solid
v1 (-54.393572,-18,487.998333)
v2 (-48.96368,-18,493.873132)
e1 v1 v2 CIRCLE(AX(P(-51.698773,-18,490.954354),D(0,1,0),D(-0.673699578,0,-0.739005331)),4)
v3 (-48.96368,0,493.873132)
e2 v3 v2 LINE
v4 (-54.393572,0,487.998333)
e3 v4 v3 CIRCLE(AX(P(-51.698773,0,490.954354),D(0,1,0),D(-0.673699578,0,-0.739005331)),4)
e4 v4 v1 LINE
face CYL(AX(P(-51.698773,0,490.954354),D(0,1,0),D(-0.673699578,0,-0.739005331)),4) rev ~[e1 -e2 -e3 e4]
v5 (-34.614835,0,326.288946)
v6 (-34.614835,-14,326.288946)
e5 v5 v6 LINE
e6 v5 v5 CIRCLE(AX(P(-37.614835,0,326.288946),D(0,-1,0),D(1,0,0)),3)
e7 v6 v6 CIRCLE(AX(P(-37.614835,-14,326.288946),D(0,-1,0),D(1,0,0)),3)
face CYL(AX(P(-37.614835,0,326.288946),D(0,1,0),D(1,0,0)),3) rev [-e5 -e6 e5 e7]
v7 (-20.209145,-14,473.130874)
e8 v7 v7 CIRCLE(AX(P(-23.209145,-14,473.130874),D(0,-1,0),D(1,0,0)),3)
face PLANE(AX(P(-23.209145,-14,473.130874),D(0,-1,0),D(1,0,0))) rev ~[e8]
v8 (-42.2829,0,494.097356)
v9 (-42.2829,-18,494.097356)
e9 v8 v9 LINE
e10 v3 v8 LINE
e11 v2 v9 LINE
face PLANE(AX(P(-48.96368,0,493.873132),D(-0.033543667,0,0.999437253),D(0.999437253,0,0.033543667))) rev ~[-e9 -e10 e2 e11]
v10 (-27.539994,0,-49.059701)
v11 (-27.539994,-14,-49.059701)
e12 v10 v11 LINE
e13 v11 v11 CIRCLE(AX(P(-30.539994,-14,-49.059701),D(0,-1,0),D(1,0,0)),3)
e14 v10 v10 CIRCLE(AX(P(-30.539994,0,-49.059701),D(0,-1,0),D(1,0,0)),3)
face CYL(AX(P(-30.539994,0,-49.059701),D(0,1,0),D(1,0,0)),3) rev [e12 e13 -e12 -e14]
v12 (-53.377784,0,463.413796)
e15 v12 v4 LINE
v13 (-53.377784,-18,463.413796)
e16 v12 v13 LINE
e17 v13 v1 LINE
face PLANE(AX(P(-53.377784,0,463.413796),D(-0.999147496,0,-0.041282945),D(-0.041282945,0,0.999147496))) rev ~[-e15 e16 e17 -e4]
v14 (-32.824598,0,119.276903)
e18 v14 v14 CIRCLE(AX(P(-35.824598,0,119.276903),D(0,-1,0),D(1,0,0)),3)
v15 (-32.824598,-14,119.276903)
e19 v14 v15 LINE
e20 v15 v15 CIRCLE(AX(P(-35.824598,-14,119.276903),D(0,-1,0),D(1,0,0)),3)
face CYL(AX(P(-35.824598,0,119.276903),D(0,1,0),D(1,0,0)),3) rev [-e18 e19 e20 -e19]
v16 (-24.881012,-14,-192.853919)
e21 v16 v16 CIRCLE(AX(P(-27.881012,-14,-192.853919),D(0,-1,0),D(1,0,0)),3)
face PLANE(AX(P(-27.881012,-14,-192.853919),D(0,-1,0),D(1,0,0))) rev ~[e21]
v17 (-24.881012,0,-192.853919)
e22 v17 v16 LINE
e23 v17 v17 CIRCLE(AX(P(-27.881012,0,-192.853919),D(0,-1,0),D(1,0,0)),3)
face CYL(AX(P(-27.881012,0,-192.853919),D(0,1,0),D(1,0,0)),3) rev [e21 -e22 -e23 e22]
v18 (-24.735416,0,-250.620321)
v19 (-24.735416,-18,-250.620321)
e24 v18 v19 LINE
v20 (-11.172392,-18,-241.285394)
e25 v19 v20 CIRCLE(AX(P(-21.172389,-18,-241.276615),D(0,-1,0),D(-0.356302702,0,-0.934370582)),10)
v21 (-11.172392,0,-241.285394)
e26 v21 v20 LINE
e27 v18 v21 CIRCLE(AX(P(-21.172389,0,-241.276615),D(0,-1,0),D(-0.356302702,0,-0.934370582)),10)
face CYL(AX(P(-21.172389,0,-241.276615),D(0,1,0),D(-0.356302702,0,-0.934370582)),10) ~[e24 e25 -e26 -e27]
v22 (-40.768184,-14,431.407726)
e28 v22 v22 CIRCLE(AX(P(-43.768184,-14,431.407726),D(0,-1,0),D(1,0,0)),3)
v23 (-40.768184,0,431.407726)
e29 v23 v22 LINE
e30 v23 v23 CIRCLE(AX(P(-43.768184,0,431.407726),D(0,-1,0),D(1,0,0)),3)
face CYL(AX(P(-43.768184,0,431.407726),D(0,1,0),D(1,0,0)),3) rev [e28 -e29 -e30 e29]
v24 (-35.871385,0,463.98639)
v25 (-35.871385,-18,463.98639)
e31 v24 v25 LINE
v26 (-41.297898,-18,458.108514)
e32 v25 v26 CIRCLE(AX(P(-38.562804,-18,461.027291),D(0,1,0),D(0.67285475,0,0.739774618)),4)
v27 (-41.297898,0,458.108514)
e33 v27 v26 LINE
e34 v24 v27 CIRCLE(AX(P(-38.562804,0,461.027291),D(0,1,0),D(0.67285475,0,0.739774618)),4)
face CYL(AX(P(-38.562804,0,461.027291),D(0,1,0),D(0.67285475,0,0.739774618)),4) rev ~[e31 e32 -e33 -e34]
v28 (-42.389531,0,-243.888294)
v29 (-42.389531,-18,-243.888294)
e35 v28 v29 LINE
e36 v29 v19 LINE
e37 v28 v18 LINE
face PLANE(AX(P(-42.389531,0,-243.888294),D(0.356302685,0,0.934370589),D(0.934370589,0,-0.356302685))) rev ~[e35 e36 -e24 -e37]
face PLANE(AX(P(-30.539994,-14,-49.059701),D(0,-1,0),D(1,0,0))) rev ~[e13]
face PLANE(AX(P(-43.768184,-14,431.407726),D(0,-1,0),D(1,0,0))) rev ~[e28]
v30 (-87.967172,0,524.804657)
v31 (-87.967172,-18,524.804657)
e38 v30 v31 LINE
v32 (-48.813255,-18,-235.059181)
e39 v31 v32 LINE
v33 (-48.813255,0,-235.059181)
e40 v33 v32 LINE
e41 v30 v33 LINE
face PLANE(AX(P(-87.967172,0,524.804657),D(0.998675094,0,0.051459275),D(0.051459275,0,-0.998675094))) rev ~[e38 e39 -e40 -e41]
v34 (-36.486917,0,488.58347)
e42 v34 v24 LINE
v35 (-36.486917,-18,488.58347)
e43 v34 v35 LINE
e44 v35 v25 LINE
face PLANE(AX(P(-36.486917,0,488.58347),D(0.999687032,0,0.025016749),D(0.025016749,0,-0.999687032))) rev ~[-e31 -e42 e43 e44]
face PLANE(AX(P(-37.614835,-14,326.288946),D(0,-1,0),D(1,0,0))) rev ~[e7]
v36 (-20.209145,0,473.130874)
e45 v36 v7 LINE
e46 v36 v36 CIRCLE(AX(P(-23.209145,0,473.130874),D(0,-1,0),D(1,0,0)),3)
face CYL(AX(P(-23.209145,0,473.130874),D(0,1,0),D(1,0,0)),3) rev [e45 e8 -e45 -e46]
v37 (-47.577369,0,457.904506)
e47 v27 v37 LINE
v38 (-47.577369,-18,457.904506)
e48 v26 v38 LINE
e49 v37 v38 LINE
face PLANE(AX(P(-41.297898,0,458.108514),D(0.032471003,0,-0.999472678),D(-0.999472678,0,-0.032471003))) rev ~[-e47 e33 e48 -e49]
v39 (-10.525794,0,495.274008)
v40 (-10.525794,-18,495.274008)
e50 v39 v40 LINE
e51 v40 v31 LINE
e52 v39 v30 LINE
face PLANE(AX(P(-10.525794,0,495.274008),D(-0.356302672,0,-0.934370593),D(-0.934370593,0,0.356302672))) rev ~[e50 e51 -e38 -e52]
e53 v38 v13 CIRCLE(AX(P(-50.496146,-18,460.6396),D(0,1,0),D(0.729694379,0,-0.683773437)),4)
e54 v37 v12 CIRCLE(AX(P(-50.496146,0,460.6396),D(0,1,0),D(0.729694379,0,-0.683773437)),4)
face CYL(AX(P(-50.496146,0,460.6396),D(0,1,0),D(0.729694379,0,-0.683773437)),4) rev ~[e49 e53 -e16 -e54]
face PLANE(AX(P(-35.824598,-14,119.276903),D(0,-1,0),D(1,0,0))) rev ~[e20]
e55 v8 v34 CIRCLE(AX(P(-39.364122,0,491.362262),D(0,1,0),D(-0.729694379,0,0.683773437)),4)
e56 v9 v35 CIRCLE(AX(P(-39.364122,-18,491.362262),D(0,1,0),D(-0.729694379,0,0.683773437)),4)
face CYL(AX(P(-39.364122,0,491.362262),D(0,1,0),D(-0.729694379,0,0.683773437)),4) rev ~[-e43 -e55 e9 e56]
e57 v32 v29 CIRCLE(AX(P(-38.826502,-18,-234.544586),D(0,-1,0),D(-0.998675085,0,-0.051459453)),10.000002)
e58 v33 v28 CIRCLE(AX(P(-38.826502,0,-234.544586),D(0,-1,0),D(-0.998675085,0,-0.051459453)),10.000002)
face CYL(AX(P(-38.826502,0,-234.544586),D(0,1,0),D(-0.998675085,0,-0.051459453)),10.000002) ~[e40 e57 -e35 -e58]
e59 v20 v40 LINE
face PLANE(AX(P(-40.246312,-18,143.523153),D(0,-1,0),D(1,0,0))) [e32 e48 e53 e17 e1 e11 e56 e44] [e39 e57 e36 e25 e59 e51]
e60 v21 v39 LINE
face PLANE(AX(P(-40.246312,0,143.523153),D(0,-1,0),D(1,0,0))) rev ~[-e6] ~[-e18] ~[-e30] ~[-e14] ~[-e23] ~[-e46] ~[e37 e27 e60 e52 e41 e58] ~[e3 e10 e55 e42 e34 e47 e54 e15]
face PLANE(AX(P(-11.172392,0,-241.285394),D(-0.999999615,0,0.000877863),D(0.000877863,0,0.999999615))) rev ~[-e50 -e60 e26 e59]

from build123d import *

# Parameters (mm, degrees)
F0_R     = 3
F1_DEPTH = 18
F2_DEPTH = 14


# Not quite as in the source:
# - ends of sketch curves that miss each other by under 0.0002 mm in the source are joined


with BuildPart() as f1:
    # F0 (on Front) → F1 (new body)
    with BuildSketch(Plane.XZ):
        with BuildLine():
            Line((-42.3895305789, -243.8882939158), (-24.7354158314, -250.6203213983))
            ThreePointArc((-24.7354158314, -250.6203213983), (-15.5028330705, -249.5140993631), (-11.1723924415, -241.2853938543))
            Line((-11.1723924415, -241.2853938543), (-10.5257942379, 495.2740080398))
            Line((-10.5257942379, 495.2740080398), (-87.9671722006, 524.8046568947))
            Line((-87.9671722006, 524.8046568947), (-48.8132548023, -235.0591811233))
            ThreePointArc((-48.8132548023, -235.0591811233), (-46.9127527413, -240.4278329279), (-42.3895305789, -243.8882939158))
        make_face()
        with Locations((-27.881012126, -192.8539189117)):
            Circle(F0_R, mode=Mode.SUBTRACT)
        with Locations((-30.5399937075, -49.059701124)):
            Circle(F0_R, mode=Mode.SUBTRACT)
        with Locations((-35.8245981399, 119.2769033151)):
            Circle(F0_R, mode=Mode.SUBTRACT)
        with Locations((-37.6148353963, 326.2889456799)):
            Circle(F0_R, mode=Mode.SUBTRACT)
        with BuildLine():
            ThreePointArc((-35.8713849562, 463.9863896495), (-35.6237850386, 458.3139596858), (-41.2978981422, 458.1085140717))
            Line((-41.2978981422, 458.1085140717), (-47.5773687005, 457.9045057833))
            ThreePointArc((-47.5773687005, 457.9045057833), (-53.2508540354, 457.7393262229), (-53.3777836629, 463.4137960782))
            Line((-53.3777836629, 463.4137960782), (-54.3935717097, 487.9983330149))
            ThreePointArc((-54.3935717097, 487.9983330149), (-54.636241933, 493.6693642066), (-48.9636796908, 493.8731318846))
            Line((-48.9636796908, 493.8731318846), (-42.2828997396, 494.0973559272))
            ThreePointArc((-42.2828997396, 494.0973559272), (-36.6071005964, 494.2603360531), (-36.4869165759, 488.5834695431))
            Line((-36.4869165759, 488.5834695431), (-35.8713849562, 463.9863896495))
        make_face(mode=Mode.SUBTRACT)
        with Locations((-43.7681841537, 431.407725542)):
            Circle(F0_R, mode=Mode.SUBTRACT)
        with Locations((-23.2091454593, 473.1308742023)):
            Circle(F0_R, mode=Mode.SUBTRACT)
        with Locations((-43.7681841537, 431.407725542)):
            Circle(F0_R)
        with Locations((-23.2091454593, 473.1308742023)):
            Circle(F0_R)
        with Locations((-37.6148353963, 326.2889456799)):
            Circle(F0_R)
        with Locations((-35.8245981399, 119.2769033151)):
            Circle(F0_R)
        with Locations((-27.881012126, -192.8539189117)):
            Circle(F0_R)
        with Locations((-30.5399937075, -49.059701124)):
            Circle(F0_R)
    extrude(amount=F1_DEPTH)

    # F0 (on Front) → F2 (cut)
    with BuildSketch(Plane.XZ):
        with Locations((-43.7681841537, 431.407725542)):
            Circle(F0_R)
        with Locations((-23.2091454593, 473.1308742023)):
            Circle(F0_R)
        with Locations((-37.6148353963, 326.2889456799)):
            Circle(F0_R)
        with Locations((-35.8245981399, 119.2769033151)):
            Circle(F0_R)
        with Locations((-27.881012126, -192.8539189117)):
            Circle(F0_R)
        with Locations((-30.5399937075, -49.059701124)):
            Circle(F0_R)
    extrude(amount=F2_DEPTH, mode=Mode.SUBTRACT)


solid = f1.part
